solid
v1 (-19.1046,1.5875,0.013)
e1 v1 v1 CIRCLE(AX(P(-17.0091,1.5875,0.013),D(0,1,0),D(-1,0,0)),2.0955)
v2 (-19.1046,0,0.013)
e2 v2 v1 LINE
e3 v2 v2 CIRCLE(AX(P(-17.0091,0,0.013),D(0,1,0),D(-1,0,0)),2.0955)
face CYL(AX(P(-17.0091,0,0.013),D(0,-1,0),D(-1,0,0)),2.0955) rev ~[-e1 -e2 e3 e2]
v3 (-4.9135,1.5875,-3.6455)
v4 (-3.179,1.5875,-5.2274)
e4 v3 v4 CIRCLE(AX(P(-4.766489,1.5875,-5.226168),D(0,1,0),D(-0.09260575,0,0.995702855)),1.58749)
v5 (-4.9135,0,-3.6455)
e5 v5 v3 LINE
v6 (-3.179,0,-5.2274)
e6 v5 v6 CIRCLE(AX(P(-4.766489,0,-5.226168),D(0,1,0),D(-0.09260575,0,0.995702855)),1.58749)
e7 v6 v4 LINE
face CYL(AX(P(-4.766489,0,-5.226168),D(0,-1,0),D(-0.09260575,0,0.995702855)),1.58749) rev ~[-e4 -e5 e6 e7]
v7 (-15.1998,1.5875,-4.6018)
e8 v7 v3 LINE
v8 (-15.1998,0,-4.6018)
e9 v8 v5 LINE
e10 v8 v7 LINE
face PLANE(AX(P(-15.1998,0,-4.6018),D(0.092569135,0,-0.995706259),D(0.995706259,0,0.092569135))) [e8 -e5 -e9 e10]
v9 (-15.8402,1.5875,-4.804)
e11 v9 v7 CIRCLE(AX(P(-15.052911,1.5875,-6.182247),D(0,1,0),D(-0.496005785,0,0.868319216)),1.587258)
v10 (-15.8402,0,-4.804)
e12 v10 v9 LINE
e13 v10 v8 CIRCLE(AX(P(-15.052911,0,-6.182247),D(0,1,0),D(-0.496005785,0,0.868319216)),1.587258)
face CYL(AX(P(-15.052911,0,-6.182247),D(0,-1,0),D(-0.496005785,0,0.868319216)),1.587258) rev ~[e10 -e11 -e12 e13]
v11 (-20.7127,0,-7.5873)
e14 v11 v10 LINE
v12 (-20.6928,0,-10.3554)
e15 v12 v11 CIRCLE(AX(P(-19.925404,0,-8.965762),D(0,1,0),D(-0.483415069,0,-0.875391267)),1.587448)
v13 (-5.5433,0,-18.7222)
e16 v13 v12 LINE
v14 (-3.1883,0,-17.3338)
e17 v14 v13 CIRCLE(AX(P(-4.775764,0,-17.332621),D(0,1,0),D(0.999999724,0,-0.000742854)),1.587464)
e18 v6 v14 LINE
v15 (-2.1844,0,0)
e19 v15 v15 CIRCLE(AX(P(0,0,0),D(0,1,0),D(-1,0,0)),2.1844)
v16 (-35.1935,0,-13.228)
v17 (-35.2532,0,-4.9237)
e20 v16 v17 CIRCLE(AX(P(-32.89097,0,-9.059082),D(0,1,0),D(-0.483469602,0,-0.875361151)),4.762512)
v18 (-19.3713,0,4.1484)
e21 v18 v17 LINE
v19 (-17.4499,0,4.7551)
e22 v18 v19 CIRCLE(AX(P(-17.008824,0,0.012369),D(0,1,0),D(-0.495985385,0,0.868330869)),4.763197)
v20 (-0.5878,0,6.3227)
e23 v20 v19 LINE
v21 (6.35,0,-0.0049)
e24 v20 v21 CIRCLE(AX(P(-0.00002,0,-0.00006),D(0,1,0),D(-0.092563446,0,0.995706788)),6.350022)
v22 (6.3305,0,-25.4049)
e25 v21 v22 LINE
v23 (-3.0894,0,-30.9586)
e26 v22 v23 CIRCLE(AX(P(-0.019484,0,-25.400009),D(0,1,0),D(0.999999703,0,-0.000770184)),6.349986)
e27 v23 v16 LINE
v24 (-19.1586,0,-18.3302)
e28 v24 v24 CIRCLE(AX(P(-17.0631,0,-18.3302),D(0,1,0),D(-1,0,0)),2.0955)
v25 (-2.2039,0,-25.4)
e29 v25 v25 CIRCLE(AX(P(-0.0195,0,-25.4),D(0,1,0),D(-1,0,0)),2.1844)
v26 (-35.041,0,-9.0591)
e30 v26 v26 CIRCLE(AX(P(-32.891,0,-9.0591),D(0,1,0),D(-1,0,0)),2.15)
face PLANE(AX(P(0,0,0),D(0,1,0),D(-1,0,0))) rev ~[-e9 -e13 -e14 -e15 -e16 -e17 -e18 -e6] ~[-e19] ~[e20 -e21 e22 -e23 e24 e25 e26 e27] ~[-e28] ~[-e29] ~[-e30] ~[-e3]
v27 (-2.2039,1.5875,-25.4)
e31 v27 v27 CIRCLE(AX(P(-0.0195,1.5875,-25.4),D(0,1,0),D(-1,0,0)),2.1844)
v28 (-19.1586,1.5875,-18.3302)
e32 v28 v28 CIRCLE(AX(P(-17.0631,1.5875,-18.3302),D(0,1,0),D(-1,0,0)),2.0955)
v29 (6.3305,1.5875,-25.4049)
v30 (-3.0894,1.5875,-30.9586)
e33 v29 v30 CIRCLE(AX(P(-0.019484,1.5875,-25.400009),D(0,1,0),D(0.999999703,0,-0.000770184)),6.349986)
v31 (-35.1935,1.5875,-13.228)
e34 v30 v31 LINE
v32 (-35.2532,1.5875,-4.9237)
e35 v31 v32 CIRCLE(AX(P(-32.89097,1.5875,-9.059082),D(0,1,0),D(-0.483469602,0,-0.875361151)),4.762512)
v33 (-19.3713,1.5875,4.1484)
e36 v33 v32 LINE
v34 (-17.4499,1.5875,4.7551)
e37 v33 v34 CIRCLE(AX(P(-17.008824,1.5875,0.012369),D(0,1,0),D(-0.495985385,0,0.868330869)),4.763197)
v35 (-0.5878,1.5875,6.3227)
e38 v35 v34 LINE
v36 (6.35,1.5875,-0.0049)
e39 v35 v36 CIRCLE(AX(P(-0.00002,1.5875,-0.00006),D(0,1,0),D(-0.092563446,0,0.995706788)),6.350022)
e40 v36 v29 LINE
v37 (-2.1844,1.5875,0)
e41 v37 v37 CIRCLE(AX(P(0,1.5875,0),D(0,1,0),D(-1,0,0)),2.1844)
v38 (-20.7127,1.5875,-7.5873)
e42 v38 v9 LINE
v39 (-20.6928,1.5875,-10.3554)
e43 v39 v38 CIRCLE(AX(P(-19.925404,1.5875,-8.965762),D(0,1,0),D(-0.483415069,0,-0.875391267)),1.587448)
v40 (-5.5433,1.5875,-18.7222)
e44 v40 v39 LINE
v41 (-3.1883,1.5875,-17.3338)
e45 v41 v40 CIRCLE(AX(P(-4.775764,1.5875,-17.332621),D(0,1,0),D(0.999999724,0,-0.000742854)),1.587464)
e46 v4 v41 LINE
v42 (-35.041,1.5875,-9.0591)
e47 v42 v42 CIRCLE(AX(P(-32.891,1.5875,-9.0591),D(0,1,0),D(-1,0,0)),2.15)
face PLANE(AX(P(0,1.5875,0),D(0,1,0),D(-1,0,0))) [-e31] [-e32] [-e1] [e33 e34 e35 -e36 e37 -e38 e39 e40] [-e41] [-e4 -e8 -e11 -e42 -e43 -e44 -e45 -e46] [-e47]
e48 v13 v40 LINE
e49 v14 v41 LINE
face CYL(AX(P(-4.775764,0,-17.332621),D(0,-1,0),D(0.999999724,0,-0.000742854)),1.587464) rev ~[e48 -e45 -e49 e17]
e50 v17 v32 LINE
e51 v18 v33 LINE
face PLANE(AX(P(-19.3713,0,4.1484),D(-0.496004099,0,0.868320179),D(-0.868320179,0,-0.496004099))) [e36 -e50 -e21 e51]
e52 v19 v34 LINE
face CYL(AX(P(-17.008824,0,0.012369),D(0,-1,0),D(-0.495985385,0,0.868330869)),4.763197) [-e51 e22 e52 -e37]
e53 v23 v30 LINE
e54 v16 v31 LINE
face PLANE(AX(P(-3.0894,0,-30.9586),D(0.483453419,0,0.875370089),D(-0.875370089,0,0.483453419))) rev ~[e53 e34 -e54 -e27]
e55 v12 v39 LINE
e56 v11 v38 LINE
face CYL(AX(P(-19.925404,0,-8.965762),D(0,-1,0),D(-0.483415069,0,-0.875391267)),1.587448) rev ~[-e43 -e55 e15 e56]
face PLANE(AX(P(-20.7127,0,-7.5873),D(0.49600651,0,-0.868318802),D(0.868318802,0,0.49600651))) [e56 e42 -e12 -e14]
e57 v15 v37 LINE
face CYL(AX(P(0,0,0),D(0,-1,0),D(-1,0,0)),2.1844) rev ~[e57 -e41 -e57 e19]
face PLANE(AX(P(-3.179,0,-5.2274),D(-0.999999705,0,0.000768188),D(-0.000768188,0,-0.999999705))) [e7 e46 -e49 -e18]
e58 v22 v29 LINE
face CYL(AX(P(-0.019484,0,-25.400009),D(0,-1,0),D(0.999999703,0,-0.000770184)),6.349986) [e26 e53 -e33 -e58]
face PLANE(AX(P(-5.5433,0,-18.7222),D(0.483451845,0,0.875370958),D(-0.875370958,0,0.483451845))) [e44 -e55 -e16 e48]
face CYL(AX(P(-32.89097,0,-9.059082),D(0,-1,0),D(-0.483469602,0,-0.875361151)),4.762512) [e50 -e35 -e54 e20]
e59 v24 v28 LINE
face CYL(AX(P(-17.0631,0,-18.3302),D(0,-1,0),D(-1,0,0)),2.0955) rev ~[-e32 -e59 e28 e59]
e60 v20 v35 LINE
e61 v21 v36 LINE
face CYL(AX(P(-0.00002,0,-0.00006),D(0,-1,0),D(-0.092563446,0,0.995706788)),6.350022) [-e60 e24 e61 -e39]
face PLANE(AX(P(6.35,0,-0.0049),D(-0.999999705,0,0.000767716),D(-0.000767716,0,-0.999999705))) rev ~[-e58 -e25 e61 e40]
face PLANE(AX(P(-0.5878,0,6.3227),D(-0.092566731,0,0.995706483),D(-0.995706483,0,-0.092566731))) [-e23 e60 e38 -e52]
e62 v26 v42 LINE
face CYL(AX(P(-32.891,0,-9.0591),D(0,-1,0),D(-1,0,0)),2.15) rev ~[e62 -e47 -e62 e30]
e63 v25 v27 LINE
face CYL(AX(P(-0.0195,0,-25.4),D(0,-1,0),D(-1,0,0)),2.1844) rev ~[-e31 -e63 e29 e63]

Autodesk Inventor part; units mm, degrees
ref_plane "YZ Plane" through (0, 0, 0) normal (1, 0, 0) x (0, 1, 0)
ref_plane "XZ Plane" through (0, 0, 0) normal (0, 1, 0) x (-1, 0, 0)
ref_plane "XY Plane" through (0, 0, 0) normal (0, 0, 1) x (1, 0, 0)
sketch "main" plane through (0, 0, 0) normal (0, 0, 1) x (1, 0, 0)
  circle A0 centre (15.4343, 10.6591) radius 2.1844
  circle A1 centre (6.35, -22.225) radius 2.15
  circle A2 centre (-9.9657, 10.6591) radius 2.1844
  circle A3 centre (15.4343, -6.35) radius 2.0955
  arc A4 (19.5678, -8.7154) -> (20.176, -6.7945) centre (15.4343, -6.35) ccw
  arc A5 (21.7565, 10.0664) -> (15.4343, 17.0091) centre (15.4343, 10.6591) ccw
  arc A6 (-9.9657, 17.0091) -> (-15.5267, 7.5934) centre (-9.9657, 10.6591) ccw
  arc A7 (2.1793, -24.5243) -> (10.4836, -24.5904) centre (6.35, -22.225) ccw
  line L0 (21.7565, 10.0664) -> (20.176, -6.7945)
  line L1 (15.4343, 17.0091) -> (-9.9657, 17.0091)
  line L2 (-15.5267, 7.5934) -> (2.1793, -24.5243)
  line L3 (19.5678, -8.7154) -> (10.4836, -24.5904)
  line L4 (7.8311, -10.0478) -> (10.6181, -5.1775)
  line L5 (10.8208, -4.5372) -> (11.785, 5.7484)
  line L6 (10.2044, 7.4841) -> (-1.902, 7.4841)
  line L7 (-3.2922, 5.1301) -> (5.063, -10.0258)
  arc A8 (10.6181, -5.1775) -> (10.8208, -4.5372) centre (9.2402, -4.389) ccw
  arc A9 (5.063, -10.0258) -> (7.8311, -10.0478) centre (6.4532, -9.2594) ccw
  arc A10 (-1.902, 7.4841) -> (-3.2922, 5.1301) centre (-1.902, 5.8966) ccw
  arc A11 (11.785, 5.7484) -> (10.2044, 7.4841) centre (10.2044, 5.8966) ccw
  circle A12 centre (-2.909, -6.39) radius 2.0955
  point P0 (7.047, 1.8005)
  dimension "d0" = 4.191
  dimension "d1" = 12.7
  dimension "d2" = 12.7
  dimension "d3" = 9.525
  dimension "d4" = 9.525
  dimension "d5" = 1.5875
  dimension "d8" = 4.7625
  dimension "d9" = 4.191
sketch "Sketch1" plane through (0, 0, 0) normal (0, 1, 0) x (-1, 0, 0)
  circle A0 centre (0, 0) radius 2.1844
  circle A1 centre (32.891, -9.0591) radius 2.15
  circle A2 centre (0.0195, -25.4) radius 2.1844
  circle A3 centre (17.0091, 0.013) radius 2.0955
  arc A4 (19.3713, 4.1484) -> (17.4499, 4.7551) centre (17.0091, 0.013) ccw
  arc A5 (0.5878, 6.3227) -> (-6.35, -0.0049) centre (0, 0) ccw
  arc A6 (-6.3305, -25.4049) -> (3.0894, -30.9586) centre (0.0195, -25.4) ccw
  arc A7 (35.1935, -13.228) -> (35.2532, -4.9237) centre (32.891, -9.0591) ccw
  line L0 (0.5878, 6.3227) -> (17.4499, 4.7551)
  line L1 (-6.35, -0.0049) -> (-6.3305, -25.4049)
  line L2 (3.0894, -30.9586) -> (35.1935, -13.228)
  line L3 (19.3713, 4.1484) -> (35.2532, -4.9237)
  line L4 (20.7127, -7.5873) -> (15.8402, -4.804)
  line L5 (15.1998, -4.6018) -> (4.9135, -3.6455)
  line L6 (3.179, -5.2274) -> (3.1883, -17.3338)
  line L7 (5.5433, -18.7222) -> (20.6928, -10.3554)
  arc A8 (15.8402, -4.804) -> (15.1998, -4.6018) centre (15.0528, -6.1825) ccw
  arc A9 (20.6928, -10.3554) -> (20.7127, -7.5873) centre (19.9253, -8.9657) ccw
  arc A10 (3.1883, -17.3338) -> (5.5433, -18.7222) centre (4.7758, -17.3326) ccw
  arc A11 (4.9135, -3.6455) -> (3.179, -5.2274) centre (4.7665, -5.2262) ccw
  circle A12 centre (17.0631, -18.3302) radius 2.0955
  point P0 (0, 0)
extrude "Extrusion1" add sketch "Sketch1" along normal blind 1.5875
properties part number "mount" material "Acetal Resin, White"
